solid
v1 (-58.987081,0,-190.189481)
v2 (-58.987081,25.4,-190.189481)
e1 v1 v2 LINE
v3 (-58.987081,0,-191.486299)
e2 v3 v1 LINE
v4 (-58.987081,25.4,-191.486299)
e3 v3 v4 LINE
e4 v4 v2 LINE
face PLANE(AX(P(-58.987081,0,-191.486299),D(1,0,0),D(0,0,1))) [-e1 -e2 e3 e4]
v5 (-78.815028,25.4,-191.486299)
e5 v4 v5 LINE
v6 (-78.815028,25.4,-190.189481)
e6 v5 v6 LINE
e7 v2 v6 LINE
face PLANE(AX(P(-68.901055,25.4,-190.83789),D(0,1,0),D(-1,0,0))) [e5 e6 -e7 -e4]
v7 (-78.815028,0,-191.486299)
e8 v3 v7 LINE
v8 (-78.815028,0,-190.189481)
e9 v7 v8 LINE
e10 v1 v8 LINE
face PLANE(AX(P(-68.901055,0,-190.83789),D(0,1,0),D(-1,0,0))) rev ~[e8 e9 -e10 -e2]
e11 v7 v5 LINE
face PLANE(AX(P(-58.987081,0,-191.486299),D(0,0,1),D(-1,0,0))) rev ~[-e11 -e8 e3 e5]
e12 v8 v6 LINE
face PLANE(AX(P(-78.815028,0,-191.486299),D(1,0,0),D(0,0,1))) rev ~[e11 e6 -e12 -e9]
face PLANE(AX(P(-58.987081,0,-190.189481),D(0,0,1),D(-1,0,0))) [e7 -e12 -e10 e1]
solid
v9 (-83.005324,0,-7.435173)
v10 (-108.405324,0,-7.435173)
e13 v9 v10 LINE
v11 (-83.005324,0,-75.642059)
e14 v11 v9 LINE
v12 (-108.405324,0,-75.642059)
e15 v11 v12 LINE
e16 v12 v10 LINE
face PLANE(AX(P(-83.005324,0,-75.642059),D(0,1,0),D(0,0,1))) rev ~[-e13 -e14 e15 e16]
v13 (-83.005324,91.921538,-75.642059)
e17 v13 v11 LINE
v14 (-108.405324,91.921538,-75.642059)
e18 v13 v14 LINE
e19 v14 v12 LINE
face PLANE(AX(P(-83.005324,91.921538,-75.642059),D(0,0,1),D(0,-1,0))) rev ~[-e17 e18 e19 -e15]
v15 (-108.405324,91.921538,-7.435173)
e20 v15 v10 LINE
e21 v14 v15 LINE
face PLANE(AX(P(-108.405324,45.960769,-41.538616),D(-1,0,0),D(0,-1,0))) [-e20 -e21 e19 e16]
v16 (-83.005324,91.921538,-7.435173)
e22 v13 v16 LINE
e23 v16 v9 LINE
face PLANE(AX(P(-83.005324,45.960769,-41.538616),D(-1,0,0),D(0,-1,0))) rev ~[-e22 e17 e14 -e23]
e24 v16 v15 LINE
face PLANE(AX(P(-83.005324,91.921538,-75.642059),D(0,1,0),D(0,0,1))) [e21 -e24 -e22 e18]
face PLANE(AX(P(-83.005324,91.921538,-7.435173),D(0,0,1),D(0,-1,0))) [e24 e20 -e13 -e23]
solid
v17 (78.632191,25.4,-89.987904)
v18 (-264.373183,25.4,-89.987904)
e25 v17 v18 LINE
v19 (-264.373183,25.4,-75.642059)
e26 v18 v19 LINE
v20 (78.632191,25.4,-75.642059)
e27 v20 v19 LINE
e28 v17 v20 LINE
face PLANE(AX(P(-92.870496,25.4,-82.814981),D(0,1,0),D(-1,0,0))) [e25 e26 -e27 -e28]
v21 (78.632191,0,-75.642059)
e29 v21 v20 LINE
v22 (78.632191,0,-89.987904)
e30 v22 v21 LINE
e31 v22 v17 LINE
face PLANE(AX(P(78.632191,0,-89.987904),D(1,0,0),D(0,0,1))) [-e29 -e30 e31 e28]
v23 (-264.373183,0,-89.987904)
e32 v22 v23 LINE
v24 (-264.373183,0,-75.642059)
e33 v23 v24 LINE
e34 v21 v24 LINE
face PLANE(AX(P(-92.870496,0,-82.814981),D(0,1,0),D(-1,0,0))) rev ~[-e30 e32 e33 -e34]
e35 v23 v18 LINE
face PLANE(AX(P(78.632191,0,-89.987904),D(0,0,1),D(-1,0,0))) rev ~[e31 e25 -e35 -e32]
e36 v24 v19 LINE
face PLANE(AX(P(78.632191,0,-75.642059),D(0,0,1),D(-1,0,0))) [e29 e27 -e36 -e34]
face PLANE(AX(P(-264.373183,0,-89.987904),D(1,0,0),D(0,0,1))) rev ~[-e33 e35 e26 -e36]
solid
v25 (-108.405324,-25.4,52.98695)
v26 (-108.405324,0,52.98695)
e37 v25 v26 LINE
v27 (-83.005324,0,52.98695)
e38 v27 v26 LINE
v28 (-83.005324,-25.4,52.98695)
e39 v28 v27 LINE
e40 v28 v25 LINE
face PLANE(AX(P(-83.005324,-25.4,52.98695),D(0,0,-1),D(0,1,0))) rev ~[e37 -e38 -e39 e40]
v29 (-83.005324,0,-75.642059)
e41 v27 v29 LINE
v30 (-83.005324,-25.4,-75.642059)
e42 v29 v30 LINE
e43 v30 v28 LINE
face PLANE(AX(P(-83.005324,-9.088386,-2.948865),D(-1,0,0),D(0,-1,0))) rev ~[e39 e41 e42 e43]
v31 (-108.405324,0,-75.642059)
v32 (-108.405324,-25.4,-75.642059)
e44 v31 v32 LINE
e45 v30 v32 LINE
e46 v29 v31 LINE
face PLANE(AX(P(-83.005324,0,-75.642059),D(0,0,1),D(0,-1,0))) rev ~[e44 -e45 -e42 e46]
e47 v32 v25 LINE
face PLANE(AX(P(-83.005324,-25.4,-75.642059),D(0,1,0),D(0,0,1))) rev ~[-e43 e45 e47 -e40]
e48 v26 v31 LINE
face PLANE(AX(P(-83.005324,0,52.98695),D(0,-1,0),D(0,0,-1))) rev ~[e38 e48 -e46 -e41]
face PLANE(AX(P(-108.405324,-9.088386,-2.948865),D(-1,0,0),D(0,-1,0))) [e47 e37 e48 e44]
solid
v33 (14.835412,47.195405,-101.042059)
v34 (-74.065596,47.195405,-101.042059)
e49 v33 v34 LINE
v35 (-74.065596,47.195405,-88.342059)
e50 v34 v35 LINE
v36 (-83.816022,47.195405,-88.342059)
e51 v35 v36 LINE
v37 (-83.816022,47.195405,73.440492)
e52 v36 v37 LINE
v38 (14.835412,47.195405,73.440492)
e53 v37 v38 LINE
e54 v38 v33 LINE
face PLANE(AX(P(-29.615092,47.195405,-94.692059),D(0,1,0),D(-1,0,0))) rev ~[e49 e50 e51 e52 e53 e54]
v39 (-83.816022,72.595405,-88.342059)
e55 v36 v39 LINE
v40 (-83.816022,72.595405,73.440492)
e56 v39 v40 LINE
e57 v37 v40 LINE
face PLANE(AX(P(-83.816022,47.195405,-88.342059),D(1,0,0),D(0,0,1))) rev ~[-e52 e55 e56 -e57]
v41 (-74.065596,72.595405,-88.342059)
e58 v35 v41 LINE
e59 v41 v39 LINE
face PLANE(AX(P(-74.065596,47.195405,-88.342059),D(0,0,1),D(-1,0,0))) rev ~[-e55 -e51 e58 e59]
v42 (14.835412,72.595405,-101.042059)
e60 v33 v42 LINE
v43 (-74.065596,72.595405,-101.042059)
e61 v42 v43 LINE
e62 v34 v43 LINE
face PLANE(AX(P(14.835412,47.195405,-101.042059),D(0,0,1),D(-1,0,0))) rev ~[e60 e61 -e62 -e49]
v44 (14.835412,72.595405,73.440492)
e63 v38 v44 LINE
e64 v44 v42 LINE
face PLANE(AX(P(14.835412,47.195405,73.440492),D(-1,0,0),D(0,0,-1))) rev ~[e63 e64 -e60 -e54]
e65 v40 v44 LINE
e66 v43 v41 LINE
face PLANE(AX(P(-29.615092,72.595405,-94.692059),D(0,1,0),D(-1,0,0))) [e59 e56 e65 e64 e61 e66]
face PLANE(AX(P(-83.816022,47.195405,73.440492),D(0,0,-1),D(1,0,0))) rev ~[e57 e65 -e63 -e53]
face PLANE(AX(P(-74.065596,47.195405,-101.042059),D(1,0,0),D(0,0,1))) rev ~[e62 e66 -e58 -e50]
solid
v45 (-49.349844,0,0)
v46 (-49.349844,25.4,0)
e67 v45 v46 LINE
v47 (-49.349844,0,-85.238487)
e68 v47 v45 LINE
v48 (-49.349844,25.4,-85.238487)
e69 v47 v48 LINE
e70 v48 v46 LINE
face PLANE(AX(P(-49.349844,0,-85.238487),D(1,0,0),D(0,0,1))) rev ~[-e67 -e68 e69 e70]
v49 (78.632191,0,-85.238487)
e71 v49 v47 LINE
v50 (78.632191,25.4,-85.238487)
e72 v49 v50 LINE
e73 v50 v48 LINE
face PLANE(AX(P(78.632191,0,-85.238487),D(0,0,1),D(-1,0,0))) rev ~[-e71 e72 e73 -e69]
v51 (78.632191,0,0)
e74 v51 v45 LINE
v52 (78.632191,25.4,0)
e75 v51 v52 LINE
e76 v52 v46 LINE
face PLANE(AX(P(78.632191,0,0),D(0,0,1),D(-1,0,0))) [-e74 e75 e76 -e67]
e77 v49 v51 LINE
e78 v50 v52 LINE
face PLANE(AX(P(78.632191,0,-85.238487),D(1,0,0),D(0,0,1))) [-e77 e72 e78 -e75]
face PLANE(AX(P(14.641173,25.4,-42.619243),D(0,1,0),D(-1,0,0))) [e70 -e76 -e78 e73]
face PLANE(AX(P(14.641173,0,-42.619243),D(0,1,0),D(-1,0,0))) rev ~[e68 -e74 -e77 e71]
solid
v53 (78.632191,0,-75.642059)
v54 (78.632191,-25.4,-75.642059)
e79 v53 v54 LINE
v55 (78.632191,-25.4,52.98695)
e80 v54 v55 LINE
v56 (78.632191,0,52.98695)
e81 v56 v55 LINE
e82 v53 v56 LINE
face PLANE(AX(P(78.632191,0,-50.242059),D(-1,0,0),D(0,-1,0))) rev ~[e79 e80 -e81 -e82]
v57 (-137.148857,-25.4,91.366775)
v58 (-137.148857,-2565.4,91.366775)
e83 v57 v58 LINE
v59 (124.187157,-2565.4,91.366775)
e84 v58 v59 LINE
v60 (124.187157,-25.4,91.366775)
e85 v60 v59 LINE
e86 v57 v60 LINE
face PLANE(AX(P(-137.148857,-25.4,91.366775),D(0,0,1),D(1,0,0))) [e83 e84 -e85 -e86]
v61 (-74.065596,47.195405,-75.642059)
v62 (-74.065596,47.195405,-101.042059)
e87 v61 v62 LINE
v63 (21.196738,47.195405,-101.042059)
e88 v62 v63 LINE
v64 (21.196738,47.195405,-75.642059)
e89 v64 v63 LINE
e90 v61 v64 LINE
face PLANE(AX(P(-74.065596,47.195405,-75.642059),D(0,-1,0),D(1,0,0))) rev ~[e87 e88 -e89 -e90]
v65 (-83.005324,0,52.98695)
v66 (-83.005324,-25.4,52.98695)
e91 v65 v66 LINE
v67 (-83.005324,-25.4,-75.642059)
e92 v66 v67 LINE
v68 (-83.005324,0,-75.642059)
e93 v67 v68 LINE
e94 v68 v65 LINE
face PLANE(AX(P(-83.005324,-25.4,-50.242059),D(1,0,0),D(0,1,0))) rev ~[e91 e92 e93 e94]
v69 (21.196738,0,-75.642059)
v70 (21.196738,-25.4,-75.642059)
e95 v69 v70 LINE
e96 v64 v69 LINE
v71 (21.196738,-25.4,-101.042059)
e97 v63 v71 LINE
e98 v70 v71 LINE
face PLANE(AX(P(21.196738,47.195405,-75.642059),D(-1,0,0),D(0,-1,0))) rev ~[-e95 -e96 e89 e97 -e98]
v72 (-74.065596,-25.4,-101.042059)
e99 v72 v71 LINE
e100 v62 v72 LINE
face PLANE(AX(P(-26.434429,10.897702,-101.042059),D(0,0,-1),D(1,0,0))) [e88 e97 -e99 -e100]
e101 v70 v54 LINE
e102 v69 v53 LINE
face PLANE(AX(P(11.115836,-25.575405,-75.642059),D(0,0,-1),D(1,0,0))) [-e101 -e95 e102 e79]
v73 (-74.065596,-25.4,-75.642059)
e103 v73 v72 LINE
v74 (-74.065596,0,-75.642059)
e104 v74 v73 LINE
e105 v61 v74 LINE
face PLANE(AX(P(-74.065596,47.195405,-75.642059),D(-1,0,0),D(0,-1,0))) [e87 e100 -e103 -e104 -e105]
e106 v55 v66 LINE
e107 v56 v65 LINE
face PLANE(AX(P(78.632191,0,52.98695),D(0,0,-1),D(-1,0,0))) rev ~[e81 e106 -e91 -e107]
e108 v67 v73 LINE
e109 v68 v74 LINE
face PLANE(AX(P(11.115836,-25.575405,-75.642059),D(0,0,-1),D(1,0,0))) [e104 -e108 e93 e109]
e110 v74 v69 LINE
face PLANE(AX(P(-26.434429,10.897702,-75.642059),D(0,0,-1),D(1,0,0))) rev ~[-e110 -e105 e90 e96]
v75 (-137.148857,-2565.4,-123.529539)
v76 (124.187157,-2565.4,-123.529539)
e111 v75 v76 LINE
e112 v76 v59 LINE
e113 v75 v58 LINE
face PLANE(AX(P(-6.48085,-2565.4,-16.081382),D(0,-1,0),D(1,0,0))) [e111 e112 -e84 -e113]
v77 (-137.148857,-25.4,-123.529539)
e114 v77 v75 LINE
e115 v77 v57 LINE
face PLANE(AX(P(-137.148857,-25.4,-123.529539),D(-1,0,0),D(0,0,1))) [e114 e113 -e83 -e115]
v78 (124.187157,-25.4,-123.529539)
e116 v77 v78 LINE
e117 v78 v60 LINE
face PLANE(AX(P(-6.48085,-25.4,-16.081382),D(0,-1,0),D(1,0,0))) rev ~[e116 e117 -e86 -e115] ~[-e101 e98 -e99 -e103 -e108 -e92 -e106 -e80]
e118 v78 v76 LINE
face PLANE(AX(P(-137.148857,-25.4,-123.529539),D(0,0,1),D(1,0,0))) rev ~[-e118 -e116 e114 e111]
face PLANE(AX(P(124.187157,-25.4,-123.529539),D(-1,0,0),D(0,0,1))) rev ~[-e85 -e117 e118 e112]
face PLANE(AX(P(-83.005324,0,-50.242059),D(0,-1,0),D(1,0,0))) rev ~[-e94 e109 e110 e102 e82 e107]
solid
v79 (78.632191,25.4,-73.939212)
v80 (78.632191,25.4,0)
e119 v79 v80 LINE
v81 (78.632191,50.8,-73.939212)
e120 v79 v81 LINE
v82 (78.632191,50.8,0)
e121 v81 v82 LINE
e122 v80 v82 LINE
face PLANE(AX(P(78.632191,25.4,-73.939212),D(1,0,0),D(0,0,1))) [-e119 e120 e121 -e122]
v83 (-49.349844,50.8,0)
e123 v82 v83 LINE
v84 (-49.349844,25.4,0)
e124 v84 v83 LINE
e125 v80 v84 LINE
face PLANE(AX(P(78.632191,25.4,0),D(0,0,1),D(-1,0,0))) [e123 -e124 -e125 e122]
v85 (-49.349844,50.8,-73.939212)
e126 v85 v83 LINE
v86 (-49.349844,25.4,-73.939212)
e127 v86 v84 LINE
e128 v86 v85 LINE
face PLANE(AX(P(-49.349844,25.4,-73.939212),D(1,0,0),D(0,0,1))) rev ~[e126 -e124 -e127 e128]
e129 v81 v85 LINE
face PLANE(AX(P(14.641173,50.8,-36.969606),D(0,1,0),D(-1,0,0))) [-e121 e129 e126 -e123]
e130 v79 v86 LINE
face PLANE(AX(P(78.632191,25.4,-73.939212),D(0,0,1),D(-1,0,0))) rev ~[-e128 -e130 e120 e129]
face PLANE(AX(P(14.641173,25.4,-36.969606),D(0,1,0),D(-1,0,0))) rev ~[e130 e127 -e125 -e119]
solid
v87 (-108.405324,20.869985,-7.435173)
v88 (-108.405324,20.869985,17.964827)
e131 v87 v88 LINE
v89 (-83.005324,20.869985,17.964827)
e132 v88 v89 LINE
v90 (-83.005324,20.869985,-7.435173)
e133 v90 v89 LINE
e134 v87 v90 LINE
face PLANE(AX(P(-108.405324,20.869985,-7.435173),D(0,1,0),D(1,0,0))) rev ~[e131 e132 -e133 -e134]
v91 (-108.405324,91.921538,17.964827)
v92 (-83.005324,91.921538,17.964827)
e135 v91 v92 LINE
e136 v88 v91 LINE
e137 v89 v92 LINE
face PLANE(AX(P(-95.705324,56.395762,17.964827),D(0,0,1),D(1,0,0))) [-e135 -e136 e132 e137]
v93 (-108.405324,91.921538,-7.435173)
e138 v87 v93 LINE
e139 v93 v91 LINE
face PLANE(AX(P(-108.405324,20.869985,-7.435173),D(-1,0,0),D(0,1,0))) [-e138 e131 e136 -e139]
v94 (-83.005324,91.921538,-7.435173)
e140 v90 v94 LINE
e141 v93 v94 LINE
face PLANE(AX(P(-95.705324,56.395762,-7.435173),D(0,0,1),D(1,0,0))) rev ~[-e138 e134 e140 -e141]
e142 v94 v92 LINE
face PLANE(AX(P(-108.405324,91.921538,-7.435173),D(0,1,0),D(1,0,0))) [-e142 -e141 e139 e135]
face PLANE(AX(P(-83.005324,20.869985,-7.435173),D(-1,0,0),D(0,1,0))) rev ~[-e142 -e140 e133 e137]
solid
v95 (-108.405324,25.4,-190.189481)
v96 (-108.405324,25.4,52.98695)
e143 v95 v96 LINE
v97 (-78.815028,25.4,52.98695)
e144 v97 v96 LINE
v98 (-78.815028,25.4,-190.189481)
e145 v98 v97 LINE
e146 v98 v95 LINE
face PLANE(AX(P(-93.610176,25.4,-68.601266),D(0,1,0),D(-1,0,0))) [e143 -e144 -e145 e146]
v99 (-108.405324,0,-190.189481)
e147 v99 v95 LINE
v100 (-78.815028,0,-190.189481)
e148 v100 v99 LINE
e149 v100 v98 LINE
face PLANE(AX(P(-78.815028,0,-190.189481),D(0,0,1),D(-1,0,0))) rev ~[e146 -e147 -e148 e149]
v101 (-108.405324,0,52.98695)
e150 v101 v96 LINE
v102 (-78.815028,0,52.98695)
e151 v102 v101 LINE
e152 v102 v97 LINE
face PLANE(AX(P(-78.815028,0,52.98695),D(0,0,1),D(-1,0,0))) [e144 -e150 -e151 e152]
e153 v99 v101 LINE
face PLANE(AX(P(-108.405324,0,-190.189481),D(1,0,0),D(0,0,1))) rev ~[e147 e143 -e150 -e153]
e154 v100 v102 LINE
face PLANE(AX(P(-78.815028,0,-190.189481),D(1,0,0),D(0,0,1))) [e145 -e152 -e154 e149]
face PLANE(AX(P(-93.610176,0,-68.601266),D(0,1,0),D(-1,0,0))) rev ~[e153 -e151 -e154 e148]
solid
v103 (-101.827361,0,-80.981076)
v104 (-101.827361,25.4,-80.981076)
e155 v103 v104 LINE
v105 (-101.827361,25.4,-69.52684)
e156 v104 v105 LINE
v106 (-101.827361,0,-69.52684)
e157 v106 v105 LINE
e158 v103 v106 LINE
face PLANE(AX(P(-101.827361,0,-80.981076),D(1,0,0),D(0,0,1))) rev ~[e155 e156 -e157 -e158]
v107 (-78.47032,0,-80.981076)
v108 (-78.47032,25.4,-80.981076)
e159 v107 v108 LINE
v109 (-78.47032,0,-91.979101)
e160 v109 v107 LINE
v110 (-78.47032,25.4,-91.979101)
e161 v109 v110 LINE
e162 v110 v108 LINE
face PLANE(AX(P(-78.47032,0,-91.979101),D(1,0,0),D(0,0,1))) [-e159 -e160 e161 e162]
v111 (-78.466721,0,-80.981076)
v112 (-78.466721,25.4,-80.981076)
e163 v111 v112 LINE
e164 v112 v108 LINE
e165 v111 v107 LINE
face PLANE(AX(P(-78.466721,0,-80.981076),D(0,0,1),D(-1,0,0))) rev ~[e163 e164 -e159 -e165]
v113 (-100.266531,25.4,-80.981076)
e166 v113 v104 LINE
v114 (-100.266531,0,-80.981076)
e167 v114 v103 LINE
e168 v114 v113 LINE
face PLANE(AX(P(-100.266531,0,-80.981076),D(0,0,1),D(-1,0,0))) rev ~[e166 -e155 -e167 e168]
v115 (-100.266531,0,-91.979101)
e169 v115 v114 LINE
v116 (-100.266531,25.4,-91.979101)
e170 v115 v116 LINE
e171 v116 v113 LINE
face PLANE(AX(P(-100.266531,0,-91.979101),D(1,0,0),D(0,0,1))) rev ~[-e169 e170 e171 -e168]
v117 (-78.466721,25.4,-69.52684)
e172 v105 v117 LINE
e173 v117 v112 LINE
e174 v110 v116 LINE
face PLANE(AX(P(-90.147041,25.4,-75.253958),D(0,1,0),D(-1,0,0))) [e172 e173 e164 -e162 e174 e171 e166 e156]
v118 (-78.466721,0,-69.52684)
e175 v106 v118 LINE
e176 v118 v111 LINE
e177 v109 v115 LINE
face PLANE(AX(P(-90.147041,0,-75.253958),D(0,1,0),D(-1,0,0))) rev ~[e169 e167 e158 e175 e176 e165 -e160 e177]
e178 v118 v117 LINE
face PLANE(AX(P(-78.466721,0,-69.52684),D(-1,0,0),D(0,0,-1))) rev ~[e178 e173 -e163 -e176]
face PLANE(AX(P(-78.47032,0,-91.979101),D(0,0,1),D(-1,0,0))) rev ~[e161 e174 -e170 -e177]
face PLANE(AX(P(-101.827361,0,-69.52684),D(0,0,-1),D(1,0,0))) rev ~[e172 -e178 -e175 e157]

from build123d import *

# Parameters (mm, degrees)
F0_W      = 78.6321908236
F0_H      = 50.2420589328
F0_W_2    = 83.0053240061
F1_DEPTH  = 25.4
F2_W      = 26.6048051417
F2_H      = 12.7
F2_W_2    = 1.4717131853
F2_H_2    = 25.4
F3_DEPTH  = 25.4
F4_W      = 261.3360136747
F4_H      = 214.8963138461
F5_DEPTH  = 2540
F6_W      = 91.9215381145
F6_H      = 68.2068861365
F7_DEPTH  = 25.4
F8_W      = 18.1767717004
F8_H      = 111.8716299534
F8_H_2    = 16.7573786616
F9_DEPTH  = 25.4
F10_W     = 19.8279470205
F10_H     = 1.2968182564
F11_DEPTH = 25.4
F10_W_2   = 29.5902959347
F10_H_2   = 243.1764304638
F12_W     = 25.4
F12_H     = 71.0515528917
F13_DEPTH = 25.4
F14_W     = 21.7962116003
F14_H     = 10.9980255365
F15_DEPTH = 25.4
F16_W     = 95.2623337507
F16_H     = 72.595404768
F17_DEPTH = 25.4
F18_W     = 88.901007548
F18_H     = 12.7
F19_DEPTH = 25.4
F20_W     = 343.005374074
F20_H     = 14.3458449006
F21_DEPTH = 25.4
F22_W     = 127.9820352793
F22_H     = 85.2384865284
F23_DEPTH = 25.4
F24_W     = 127.9820352793
F24_H     = 73.9392116666
F25_DEPTH = 25.4


with BuildPart() as f1:
    # F0 (on Front) → F1 (new body)
    with BuildSketch(Plane.XZ):
        Polygon((-83.0053240061, 0), (0, 0), (78.6321908236, 0), (78.6321908236, 52.9869496822), (-83.0053240061, 52.9869496822), align=None)
        with Locations((39.3160954118, -25.1210294664)):
            Rectangle(F0_W, F0_H)
        with Locations((-41.502662003, -25.1210294664)):
            Rectangle(F0_W_2, F0_H)
    extrude(amount=F1_DEPTH)

    # F2 (on face) → F3 (join)
    with BuildSketch(Plane(origin=(0, 0, -50.2420589328), x_dir=(1, 0, 0), z_dir=(0, 0, -1))):
        Polygon((78.6321908236, 25.7508095026), (-56.4005188644, 25.7508095026), (-56.4005188644, 25.4), (77.1604776382, 25.4), (78.6321908236, 25.4), align=None)
        Polygon((77.1604776382, 25.4), (-56.4005188644, 25.4), (-56.4005188644, 12.7), (-56.4005188644, 0), (77.1604776382, 0), align=None)
        with Locations((-69.7029214352, 19.05)):
            Rectangle(F2_W, F2_H)
        with Locations((77.8963342309, 12.7)):
            Rectangle(F2_W_2, F2_H_2)
        with Locations((-69.7029214352, 6.35)):
            Rectangle(F2_W, F2_H)
    extrude(amount=F3_DEPTH)

    # F4 (on face) → F5 (join)
    with BuildSketch(Plane.XZ.offset(25.4)):
        with Locations((-6.4808502793, -16.0813815892)):
            Rectangle(F4_W, F4_H)
    extrude(amount=F5_DEPTH)

    # F16 (on face) → F17 (join)
    with BuildSketch(Plane(origin=(0, 0, -75.6420589328), x_dir=(1, 0, 0), z_dir=(0, 0, -1))):
        with Locations((-26.4344289899, -10.897702384)):
            Rectangle(F16_W, F16_H)
    extrude(amount=F17_DEPTH)


with BuildPart() as f7:
    # F6 (on face) → F7 (new body)
    with BuildSketch(Plane(origin=(-83.0053240061, 0, 0), x_dir=(0, -1, 0), z_dir=(-1, 0, 0))):
        with Locations((-45.9607690573, -41.5386158645)):
            Rectangle(F6_W, F6_H)
    extrude(amount=F7_DEPTH)


with BuildPart() as f9:
    # F8 (on face) → F9 (new body)
    with BuildSketch(Plane(origin=(-83.0053240061, 0, 0), x_dir=(0, -1, 0), z_dir=(-1, 0, 0))):
        with Locations((9.0883858502, -2.9488652945)):
            Rectangle(F8_W, F8_H)
        with Locations((9.0883858502, -67.263369602)):
            Rectangle(F8_W, F8_H_2)
        Polygon((18.1767717004, 52.9869496822), (18.1767717004, -58.8846802711), (18.1767717004, -75.6420589328), (25.4, -75.6420589328), (25.4, 52.9869496822), align=None)
    extrude(amount=F9_DEPTH)


with BuildPart() as f11:
    # F10 (on face) → F11 (new body)
    with BuildSketch(Plane(origin=(0, 0, 0), x_dir=(-1, 0, 0), z_dir=(0, 1, 0))):
        with Locations((68.9010545611, -190.8378899097)):
            Rectangle(F10_W, F10_H)
    extrude(amount=F11_DEPTH)


with BuildPart() as f11b:
    # F10 (on face) → F11, piece 2 (new body)
    with BuildSketch(Plane(origin=(0, 0, 0), x_dir=(-1, 0, 0), z_dir=(0, 1, 0))):
        with Locations((93.6101760387, -68.6012655497)):
            Rectangle(F10_W_2, F10_H_2)
    extrude(amount=F11_DEPTH)


with BuildPart() as f13:
    # F12 (on face) → F13 (new body)
    with BuildSketch(Plane.XY.offset(-7.4351727962)):
        with Locations((-95.7053240061, 56.3957616687)):
            Rectangle(F12_W, F12_H)
    extrude(amount=F13_DEPTH)


with BuildPart() as f15:
    # F14 (on face) → F15 (new body)
    with BuildSketch(Plane(origin=(0, 0, 0), x_dir=(-1, 0, 0), z_dir=(0, 1, 0))):
        Polygon((78.4667208791, -69.5268400013), (78.4667208791, -80.9810757637), (78.4703195095, -80.9810757637), (100.2665311098, -80.9810757637), (101.8273606896, -80.9810757637), (101.8273606896, -69.5268400013), align=None)
        with Locations((89.3684253097, -86.480088532)):
            Rectangle(F14_W, F14_H)
    extrude(amount=F15_DEPTH)


with BuildPart() as f19:
    # F18 (on face) → F19 (new body)
    with BuildSketch(Plane(origin=(0, 47.195404768, 0), x_dir=(-1, 0, 0), z_dir=(0, 1, 0))):
        with Locations((29.6150920913, -94.6920589328)):
            Rectangle(F18_W, F18_H)
        Polygon((-14.8354116827, -88.3420589328), (74.0655958652, -88.3420589328), (83.8160216808, -88.3420589328), (83.8160216808, 73.4404921532), (-14.8354116827, 73.4404921532), align=None)
    extrude(amount=F19_DEPTH)


with BuildPart() as f21:
    # F20 (on face) → F21 (new body)
    with BuildSketch(Plane(origin=(0, 0, 0), x_dir=(-1, 0, 0), z_dir=(0, 1, 0))):
        with Locations((92.8704962134, -82.8149813831)):
            Rectangle(F20_W, F20_H)
    extrude(amount=F21_DEPTH)


with BuildPart() as f23:
    # F22 (on face) → F23 (new body)
    with BuildSketch(Plane(origin=(0, 0, 0), x_dir=(-1, 0, 0), z_dir=(0, 1, 0))):
        with Locations((-14.6411731839, -42.6192432642)):
            Rectangle(F22_W, F22_H)
    extrude(amount=F23_DEPTH)


with BuildPart() as f25:
    # F24 (on face) → F25 (new body)
    with BuildSketch(Plane(origin=(0, 25.4, 0), x_dir=(-1, 0, 0), z_dir=(0, 1, 0))):
        with Locations((-14.6411731839, -36.9696058333)):
            Rectangle(F24_W, F24_H)
    extrude(amount=F25_DEPTH)


solid = Compound([f1.part, f7.part, f9.part, f11.part, f11b.part, f13.part, f15.part, f19.part, f21.part, f23.part, f25.part])
